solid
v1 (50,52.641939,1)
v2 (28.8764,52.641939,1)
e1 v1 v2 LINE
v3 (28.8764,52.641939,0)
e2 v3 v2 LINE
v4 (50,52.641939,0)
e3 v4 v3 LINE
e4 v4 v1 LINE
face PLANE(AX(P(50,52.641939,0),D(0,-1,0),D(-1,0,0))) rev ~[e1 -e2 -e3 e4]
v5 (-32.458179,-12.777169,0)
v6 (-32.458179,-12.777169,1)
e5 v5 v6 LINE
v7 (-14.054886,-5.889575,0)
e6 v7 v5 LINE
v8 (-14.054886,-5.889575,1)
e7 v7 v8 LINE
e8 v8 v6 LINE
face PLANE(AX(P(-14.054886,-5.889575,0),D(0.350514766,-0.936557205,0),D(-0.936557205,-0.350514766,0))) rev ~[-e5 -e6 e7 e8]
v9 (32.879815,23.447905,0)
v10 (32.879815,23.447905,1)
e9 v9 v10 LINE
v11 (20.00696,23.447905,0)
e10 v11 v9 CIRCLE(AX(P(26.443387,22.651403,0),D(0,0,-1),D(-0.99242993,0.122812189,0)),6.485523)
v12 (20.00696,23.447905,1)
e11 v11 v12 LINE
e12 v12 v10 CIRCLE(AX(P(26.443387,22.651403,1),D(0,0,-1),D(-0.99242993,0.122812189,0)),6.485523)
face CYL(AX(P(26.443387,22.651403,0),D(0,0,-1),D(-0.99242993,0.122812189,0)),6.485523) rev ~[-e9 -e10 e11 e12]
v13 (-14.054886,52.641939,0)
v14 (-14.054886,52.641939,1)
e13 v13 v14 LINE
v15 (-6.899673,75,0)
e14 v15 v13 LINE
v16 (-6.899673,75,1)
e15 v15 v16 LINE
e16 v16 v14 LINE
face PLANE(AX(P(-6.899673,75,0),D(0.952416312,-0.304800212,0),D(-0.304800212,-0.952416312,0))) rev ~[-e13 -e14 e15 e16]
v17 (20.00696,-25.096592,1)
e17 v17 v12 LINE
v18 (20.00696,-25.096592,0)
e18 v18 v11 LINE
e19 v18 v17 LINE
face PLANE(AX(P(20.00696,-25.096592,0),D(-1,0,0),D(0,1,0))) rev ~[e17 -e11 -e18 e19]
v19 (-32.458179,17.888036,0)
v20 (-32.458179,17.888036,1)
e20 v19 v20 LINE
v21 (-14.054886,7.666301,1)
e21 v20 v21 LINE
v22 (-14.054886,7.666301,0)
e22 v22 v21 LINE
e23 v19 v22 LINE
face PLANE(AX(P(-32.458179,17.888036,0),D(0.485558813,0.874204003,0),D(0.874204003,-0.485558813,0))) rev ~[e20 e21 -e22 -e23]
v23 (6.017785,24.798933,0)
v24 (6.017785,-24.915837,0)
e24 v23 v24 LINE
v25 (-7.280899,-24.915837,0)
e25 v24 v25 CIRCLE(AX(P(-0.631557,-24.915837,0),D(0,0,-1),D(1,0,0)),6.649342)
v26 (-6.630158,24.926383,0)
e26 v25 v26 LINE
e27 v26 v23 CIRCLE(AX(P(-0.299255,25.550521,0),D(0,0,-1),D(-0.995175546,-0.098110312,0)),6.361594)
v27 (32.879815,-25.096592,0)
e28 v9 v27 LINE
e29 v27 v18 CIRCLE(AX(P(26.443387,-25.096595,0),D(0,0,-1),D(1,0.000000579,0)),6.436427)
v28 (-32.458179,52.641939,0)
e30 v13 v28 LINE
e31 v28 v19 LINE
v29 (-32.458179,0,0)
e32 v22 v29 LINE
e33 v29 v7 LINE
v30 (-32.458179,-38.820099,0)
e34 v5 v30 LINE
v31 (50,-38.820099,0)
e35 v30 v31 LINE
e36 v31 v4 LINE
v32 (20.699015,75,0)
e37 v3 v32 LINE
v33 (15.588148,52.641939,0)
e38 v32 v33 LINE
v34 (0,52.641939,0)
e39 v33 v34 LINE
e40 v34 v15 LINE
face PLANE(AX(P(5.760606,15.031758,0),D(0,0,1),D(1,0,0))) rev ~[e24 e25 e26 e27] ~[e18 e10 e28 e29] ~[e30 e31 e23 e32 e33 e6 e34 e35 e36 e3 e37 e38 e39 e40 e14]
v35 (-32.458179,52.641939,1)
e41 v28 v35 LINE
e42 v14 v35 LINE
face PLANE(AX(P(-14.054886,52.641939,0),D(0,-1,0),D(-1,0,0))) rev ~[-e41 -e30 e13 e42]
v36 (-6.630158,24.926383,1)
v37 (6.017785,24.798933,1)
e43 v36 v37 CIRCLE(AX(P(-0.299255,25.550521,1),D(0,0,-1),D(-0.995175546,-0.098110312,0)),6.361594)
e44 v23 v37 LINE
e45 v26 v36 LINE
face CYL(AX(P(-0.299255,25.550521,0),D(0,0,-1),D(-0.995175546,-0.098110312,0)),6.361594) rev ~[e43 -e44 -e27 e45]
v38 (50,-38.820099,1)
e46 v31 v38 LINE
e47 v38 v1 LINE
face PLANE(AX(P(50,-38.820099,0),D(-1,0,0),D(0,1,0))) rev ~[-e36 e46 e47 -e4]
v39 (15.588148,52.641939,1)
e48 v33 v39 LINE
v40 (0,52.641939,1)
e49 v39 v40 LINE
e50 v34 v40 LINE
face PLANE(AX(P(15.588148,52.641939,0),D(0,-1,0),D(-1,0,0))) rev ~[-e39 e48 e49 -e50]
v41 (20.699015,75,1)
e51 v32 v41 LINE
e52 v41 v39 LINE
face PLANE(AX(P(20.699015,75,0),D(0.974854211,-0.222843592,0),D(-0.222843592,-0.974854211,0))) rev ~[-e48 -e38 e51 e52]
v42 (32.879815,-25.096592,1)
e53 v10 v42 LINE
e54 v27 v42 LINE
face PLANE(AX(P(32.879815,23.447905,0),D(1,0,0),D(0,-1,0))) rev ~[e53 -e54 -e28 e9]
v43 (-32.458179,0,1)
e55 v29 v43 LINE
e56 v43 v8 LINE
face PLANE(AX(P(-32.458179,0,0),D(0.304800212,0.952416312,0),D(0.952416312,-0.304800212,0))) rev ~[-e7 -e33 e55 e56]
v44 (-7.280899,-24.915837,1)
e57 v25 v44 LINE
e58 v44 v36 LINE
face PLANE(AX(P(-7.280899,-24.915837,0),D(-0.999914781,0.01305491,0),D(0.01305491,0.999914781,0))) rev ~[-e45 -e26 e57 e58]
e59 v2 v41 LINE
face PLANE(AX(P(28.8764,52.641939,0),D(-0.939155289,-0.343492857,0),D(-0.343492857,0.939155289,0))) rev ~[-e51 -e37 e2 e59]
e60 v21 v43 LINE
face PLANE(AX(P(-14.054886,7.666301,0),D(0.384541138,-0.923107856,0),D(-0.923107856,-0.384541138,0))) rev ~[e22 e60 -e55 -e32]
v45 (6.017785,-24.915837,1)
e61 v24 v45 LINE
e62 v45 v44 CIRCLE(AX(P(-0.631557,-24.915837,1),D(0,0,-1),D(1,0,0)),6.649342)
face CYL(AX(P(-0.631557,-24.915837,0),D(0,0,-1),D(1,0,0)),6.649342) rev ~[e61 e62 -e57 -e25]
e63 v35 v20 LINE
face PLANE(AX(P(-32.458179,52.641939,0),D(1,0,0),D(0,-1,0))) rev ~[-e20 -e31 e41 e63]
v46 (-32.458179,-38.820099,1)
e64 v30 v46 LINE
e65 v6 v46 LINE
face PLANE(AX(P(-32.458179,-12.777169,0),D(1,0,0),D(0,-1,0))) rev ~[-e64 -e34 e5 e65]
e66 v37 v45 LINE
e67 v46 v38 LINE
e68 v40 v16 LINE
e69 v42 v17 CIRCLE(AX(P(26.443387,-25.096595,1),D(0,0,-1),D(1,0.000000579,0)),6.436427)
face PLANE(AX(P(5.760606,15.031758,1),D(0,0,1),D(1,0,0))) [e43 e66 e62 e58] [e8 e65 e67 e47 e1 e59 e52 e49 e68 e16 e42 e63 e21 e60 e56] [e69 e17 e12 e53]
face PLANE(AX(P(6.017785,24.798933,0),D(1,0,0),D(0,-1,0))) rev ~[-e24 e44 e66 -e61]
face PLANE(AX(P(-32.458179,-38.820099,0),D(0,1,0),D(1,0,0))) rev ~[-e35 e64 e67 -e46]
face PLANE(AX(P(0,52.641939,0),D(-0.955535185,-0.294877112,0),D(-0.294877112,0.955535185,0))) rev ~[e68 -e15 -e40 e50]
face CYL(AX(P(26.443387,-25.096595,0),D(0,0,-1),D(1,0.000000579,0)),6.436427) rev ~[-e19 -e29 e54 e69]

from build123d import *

# Parameters (mm, degrees)
F1_DEPTH = 1


# Not quite as in the source:
# - ends of sketch curves that miss each other by under 0.0002 mm in the source are joined


with BuildPart() as f1:
    # F0 (on Top) → F1 (new body)
    with BuildSketch(Plane.XY):
        Polygon((28.8763996214, 52.6419393718), (20.6990148872, 75), (15.5881475657, 52.6419393718), (0, 52.6419393718), (-6.8996730261, 75), (-14.0548860654, 52.6419393718), (-32.458178699, 52.6419393718), (-32.458178699, 17.8880356252), (-14.0548860654, 7.6663014479), (-32.458178699, 0), (-14.0548860654, -5.889575201), (-32.458178699, -12.7771692351), (-32.458178699, -38.8200990856), (50, -38.8200990856), (50, 52.6419393718), align=None)
        with BuildLine():
            ThreePointArc((-6.6301580518, 24.9263830483), (-0.2351544327, 31.911792251), (6.0177850537, 24.7989334166))
            Line((6.0177850537, 24.7989334166), (6.0177850537, -24.9158367515))
            ThreePointArc((6.0177850537, -24.9158367515), (-0.631557079, -31.5651788842), (-7.2808992118, -24.9158367515))
            Line((-7.2808992118, -24.9158367515), (-6.6301580518, 24.9263830483))
        make_face(mode=Mode.SUBTRACT)
        with BuildLine():
            ThreePointArc((20.0069602579, 23.4479047358), (26.4433873817, 29.1369264448), (32.8798145056, 23.4479047358))
            Line((32.8798145056, 23.4479047358), (32.8798145056, -25.096591562))
            ThreePointArc((32.8798145056, -25.096591562), (26.443391107, -31.5330224112), (20.0069602579, -25.096591562))
            Line((20.0069602579, -25.096591562), (20.0069602579, 23.4479047358))
        make_face(mode=Mode.SUBTRACT)
    extrude(amount=F1_DEPTH)


solid = f1.part
